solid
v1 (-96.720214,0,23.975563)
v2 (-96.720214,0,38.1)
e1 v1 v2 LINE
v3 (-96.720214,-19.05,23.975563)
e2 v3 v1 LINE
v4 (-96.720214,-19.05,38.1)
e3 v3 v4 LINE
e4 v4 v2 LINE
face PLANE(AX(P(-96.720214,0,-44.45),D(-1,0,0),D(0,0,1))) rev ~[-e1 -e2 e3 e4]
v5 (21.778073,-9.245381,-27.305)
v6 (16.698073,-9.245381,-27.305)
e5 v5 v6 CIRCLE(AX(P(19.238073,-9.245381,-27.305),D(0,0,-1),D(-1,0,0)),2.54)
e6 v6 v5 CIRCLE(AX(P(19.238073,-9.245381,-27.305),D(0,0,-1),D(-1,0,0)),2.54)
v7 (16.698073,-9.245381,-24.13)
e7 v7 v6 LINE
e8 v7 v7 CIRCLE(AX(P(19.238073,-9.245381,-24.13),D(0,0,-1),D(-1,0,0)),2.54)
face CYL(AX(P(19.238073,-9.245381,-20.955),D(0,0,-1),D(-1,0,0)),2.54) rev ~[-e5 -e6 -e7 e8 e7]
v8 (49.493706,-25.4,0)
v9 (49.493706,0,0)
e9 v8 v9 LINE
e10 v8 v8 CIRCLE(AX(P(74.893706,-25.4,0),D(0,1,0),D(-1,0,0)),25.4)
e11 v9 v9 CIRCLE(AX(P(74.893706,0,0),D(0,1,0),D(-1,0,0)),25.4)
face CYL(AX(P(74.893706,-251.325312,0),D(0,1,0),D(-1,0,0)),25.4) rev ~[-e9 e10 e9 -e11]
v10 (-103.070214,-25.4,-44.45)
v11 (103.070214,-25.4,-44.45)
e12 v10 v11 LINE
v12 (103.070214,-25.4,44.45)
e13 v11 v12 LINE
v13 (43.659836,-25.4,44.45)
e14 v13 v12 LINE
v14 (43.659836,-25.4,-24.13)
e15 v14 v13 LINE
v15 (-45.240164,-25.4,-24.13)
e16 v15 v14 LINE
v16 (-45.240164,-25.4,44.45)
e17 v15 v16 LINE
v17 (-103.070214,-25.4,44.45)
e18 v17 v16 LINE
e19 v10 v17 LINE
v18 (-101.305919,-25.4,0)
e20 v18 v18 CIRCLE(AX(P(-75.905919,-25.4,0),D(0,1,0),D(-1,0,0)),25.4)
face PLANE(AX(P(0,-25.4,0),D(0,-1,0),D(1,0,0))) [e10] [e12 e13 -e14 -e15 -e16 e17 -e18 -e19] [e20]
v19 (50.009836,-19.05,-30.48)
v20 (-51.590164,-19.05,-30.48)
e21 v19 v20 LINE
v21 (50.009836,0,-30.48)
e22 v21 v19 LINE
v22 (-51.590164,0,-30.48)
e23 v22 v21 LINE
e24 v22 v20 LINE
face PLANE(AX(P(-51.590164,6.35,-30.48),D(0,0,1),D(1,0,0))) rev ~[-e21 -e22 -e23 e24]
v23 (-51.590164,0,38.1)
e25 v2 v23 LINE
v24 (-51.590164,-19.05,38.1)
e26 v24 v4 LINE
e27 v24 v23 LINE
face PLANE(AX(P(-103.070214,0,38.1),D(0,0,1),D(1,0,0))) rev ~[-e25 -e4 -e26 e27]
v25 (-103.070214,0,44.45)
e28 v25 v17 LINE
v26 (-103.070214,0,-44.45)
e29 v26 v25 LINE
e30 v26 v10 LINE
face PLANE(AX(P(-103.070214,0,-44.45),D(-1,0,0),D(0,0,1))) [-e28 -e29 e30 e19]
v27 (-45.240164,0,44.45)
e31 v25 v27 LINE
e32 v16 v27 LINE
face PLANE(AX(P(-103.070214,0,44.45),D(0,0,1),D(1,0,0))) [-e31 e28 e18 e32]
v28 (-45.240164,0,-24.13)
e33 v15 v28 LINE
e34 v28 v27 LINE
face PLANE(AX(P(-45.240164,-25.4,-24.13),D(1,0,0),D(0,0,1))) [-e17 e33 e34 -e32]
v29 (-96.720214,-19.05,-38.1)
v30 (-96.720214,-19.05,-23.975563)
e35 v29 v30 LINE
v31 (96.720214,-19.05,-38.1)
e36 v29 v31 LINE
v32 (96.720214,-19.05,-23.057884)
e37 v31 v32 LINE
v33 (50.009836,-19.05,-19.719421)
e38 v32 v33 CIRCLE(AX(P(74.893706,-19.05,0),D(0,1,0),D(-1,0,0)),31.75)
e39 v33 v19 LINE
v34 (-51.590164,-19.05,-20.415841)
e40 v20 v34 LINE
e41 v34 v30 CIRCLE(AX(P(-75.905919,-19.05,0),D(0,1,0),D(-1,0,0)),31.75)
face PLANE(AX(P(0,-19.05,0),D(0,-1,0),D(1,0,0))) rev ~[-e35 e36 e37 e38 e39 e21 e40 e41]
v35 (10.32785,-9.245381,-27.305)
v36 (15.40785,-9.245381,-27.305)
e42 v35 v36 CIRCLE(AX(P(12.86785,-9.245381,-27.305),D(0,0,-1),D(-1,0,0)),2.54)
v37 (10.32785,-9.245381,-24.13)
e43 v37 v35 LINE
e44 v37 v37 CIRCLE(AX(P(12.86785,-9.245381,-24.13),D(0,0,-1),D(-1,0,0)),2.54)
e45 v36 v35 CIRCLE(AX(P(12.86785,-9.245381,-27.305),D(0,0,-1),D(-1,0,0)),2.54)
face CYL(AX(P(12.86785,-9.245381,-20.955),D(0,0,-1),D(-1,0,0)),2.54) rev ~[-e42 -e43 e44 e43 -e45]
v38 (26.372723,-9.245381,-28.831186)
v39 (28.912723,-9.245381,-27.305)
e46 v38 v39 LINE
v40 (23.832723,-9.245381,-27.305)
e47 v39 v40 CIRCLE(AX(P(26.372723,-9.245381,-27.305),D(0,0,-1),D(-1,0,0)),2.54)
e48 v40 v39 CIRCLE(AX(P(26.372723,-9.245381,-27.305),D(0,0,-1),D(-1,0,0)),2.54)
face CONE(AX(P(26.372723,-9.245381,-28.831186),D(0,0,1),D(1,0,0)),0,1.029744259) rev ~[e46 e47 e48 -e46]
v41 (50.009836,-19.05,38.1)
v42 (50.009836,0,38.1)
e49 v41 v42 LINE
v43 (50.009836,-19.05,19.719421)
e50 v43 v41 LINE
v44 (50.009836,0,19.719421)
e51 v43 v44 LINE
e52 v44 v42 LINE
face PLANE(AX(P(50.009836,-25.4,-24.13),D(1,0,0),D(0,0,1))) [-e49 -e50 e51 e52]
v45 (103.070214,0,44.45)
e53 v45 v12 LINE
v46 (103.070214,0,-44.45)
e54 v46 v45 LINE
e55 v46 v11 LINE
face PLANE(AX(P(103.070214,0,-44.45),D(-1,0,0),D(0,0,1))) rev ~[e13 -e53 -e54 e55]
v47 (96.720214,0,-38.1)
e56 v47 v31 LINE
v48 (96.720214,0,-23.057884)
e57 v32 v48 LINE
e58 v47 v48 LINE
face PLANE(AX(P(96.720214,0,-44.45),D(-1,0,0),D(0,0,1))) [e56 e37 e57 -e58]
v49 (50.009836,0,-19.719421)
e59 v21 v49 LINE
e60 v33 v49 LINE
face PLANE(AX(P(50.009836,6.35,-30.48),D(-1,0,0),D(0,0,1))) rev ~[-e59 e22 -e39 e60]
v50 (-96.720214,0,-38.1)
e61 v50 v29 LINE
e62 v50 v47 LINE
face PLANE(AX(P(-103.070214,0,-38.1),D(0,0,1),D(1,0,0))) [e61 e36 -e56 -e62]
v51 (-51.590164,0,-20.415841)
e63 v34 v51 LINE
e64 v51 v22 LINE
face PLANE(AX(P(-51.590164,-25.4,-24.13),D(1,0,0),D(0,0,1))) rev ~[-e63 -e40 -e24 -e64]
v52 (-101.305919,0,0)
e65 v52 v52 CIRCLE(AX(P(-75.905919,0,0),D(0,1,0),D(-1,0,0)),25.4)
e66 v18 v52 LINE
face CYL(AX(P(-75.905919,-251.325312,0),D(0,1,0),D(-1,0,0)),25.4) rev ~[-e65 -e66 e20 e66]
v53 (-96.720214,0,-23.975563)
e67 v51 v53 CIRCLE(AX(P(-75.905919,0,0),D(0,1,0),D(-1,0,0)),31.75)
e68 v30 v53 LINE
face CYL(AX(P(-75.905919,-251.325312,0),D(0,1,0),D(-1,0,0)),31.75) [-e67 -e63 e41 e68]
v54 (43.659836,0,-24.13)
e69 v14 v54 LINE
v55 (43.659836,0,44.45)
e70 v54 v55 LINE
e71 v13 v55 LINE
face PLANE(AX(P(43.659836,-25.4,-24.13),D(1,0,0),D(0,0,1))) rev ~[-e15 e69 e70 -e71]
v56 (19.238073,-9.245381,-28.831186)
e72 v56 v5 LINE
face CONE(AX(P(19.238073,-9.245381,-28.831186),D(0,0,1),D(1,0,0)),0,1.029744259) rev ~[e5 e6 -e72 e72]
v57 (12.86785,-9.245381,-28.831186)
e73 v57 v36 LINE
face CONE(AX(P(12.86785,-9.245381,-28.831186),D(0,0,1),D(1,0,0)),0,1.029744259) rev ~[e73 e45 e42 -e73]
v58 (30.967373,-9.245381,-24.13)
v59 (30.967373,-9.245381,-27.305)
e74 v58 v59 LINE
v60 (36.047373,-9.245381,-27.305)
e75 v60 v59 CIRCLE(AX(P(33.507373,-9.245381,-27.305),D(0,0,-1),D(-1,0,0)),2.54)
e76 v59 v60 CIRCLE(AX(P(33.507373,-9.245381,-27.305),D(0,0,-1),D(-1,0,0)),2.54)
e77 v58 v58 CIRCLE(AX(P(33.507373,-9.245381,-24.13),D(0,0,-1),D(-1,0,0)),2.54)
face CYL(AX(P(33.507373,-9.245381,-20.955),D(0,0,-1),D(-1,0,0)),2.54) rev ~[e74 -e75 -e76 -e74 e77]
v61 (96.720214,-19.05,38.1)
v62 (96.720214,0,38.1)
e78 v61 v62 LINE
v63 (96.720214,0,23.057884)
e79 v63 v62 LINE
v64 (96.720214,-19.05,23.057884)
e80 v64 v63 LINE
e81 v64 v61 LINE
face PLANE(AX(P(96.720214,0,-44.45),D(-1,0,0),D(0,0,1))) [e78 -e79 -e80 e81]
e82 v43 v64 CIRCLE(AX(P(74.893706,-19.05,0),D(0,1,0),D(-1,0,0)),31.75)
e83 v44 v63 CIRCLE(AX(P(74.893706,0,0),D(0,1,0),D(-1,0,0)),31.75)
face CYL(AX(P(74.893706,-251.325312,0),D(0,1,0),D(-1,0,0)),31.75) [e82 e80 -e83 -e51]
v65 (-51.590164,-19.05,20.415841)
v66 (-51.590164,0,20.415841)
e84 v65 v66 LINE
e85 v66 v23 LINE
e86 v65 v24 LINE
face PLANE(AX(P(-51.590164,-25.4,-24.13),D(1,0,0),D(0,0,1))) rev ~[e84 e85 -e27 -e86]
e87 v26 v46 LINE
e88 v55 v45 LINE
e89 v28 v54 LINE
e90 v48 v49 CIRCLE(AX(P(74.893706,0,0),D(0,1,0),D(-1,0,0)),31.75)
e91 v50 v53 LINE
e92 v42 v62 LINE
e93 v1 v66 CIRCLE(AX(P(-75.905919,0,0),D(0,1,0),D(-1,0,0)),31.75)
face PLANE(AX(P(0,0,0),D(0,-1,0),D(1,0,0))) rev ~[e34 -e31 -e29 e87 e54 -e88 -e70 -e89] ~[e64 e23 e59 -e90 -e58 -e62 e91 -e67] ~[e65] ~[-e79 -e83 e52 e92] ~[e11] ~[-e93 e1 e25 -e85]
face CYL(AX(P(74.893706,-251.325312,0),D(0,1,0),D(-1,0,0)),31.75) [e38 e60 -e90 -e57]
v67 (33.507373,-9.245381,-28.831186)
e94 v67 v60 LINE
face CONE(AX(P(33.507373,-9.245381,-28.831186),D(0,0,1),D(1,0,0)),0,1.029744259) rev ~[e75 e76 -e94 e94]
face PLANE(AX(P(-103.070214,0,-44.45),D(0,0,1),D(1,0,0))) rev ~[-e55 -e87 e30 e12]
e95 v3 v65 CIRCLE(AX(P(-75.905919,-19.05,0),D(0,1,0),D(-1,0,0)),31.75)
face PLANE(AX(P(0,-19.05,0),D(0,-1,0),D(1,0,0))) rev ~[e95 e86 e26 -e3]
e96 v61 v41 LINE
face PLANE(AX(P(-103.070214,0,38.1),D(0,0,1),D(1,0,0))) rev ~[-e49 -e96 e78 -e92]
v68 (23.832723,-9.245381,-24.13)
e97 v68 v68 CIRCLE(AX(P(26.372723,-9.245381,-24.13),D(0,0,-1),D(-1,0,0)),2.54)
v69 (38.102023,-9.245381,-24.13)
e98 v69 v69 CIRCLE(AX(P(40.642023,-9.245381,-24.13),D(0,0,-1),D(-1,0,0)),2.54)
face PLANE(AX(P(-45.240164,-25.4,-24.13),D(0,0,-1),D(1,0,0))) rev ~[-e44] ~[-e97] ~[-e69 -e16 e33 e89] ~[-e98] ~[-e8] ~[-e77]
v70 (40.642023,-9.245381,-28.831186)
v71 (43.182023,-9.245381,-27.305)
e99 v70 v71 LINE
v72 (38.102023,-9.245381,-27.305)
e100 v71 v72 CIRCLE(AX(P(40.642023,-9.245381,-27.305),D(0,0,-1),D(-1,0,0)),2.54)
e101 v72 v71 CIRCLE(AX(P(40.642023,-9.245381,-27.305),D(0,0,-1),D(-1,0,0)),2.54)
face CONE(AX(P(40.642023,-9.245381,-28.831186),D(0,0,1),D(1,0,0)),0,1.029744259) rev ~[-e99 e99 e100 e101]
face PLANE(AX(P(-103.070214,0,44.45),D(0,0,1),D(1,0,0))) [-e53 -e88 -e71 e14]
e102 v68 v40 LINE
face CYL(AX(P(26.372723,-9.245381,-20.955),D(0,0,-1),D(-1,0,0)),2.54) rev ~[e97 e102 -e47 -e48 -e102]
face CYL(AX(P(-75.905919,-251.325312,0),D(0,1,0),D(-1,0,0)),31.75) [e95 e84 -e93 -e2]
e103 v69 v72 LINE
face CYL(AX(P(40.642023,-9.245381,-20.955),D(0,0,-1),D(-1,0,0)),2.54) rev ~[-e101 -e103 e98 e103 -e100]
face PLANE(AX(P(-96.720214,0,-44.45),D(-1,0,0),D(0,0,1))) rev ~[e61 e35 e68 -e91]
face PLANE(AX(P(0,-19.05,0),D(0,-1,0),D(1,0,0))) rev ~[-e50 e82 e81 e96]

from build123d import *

# Parameters (mm, degrees)
F0_W        = 206.1404287815
F0_H        = 88.9
F1_DEPTH    = 25.4
F4_D        = 50.8
F4_ON_F3_D  = 50.8
F5_W        = 88.9
F5_H        = 68.58
F6_DEPTH    = 25.401
F7_T        = 6.35
F7_T3_DEPTH = 38.1
F9_D        = 5.08
F9_DEPTH    = 3.175
F9_TIP      = 1.5261859723


# Not quite as in the source:
# - a shell that OpenCascade refuses in one call is made with other operations: the cavity is built on its own and cut out


with BuildPart() as f1:
    # F0 (on Front) → F1 (new body)
    with BuildSketch(Plane.XZ):
        Rectangle(F0_W, F0_H)
    extrude(amount=F1_DEPTH)

    # F4 (through all)
    with Locations(Plane.XZ.offset(25.4)):
        with Locations((-75.905919075, 0)):
            Hole(F4_D / 2)

    # F4 on F3 (through all)
    with Locations(Plane.XZ.offset(25.4)):
        with Locations((74.8937055469, 0)):
            Hole(F4_ON_F3_D / 2)

    # F5 (on face) → F6 (cut, through all)
    with BuildSketch(Plane.XZ.offset(25.4)):
        with Locations((-0.7901638031, 10.16)):
            Rectangle(F5_W, F5_H)
    extrude(amount=-F6_DEPTH, mode=Mode.SUBTRACT)

    # F7: shell of thickness 6.35, made by hand


with BuildPart() as f7_core1:
    # F7_t2: copy of F1
    add(f1.part)

    # the walls: a layer under each face that stays
    f7_faces = [f7_core1.faces().sort_by_distance(p)[0] for p in [
        (0, -12.7, -44.45),
        (-103.0702143908, -12.7, 0),
        (103.0702143908, -12.7, 0),
        (-68.7134762605, -25.4, -29.6333333333),
        (-74.1551890969, -12.7, 44.45),
        (73.3650252938, -12.7, 44.45),
        (-45.2401638031, -12.7, 10.16),
        (-0.7901638031, -12.7, -24.13),
        (43.6598361969, -12.7, 10.16),
        (-101.305919075, -12.7, 0),
        (49.4937055469, -12.7, 0),
    ]]
    thicken(f7_faces, amount=-F7_T, mode=Mode.SUBTRACT)

    # F7_s4 → F7_t3 (cut)
    with BuildSketch(Plane.XZ.offset(-6.35)):
        Polygon((-45.1766638031, -24.0665), (-51.5901638031, -24.13), (-51.5901638031, -30.48), (-45.2401638031, -30.48), align=None)
        Polygon((43.5963361969, -24.0665), (43.6598361969, -30.48), (50.0098361969, -30.48), (50.0098361969, -24.13), align=None)
    extrude(amount=F7_T3_DEPTH, mode=Mode.SUBTRACT)


with BuildPart() as f1_1:
    add(f1.part)

    # what is left inside the walls is the cavity
    f7_cavity = [f7_core1.part.solids().sort_by_distance(p)[0] for p in [
        (0, -12.7, -38.0365),
        (-73.404336, -6.35, 31.714994),
        (72.62573, -6.35, 31.732555),
    ]]
    add(f7_cavity, mode=Mode.SUBTRACT)

    # F9
    with Locations(Plane.XY.offset(-24.13)):
        with Locations((40.6420230865, -9.2453807592), (33.507373184, -9.2453807592), (26.3727232814, -9.2453807592), (19.2380733788, -9.2453807592), (12.8678502515, -9.2453807592)):
            Hole(F9_D / 2, depth=F9_DEPTH)
            with Locations((0, 0, -(F9_DEPTH + F9_TIP / 2))):  # 118° drill point
                Cone(0, F9_D / 2, F9_TIP, mode=Mode.SUBTRACT)


solid = f1_1.part
